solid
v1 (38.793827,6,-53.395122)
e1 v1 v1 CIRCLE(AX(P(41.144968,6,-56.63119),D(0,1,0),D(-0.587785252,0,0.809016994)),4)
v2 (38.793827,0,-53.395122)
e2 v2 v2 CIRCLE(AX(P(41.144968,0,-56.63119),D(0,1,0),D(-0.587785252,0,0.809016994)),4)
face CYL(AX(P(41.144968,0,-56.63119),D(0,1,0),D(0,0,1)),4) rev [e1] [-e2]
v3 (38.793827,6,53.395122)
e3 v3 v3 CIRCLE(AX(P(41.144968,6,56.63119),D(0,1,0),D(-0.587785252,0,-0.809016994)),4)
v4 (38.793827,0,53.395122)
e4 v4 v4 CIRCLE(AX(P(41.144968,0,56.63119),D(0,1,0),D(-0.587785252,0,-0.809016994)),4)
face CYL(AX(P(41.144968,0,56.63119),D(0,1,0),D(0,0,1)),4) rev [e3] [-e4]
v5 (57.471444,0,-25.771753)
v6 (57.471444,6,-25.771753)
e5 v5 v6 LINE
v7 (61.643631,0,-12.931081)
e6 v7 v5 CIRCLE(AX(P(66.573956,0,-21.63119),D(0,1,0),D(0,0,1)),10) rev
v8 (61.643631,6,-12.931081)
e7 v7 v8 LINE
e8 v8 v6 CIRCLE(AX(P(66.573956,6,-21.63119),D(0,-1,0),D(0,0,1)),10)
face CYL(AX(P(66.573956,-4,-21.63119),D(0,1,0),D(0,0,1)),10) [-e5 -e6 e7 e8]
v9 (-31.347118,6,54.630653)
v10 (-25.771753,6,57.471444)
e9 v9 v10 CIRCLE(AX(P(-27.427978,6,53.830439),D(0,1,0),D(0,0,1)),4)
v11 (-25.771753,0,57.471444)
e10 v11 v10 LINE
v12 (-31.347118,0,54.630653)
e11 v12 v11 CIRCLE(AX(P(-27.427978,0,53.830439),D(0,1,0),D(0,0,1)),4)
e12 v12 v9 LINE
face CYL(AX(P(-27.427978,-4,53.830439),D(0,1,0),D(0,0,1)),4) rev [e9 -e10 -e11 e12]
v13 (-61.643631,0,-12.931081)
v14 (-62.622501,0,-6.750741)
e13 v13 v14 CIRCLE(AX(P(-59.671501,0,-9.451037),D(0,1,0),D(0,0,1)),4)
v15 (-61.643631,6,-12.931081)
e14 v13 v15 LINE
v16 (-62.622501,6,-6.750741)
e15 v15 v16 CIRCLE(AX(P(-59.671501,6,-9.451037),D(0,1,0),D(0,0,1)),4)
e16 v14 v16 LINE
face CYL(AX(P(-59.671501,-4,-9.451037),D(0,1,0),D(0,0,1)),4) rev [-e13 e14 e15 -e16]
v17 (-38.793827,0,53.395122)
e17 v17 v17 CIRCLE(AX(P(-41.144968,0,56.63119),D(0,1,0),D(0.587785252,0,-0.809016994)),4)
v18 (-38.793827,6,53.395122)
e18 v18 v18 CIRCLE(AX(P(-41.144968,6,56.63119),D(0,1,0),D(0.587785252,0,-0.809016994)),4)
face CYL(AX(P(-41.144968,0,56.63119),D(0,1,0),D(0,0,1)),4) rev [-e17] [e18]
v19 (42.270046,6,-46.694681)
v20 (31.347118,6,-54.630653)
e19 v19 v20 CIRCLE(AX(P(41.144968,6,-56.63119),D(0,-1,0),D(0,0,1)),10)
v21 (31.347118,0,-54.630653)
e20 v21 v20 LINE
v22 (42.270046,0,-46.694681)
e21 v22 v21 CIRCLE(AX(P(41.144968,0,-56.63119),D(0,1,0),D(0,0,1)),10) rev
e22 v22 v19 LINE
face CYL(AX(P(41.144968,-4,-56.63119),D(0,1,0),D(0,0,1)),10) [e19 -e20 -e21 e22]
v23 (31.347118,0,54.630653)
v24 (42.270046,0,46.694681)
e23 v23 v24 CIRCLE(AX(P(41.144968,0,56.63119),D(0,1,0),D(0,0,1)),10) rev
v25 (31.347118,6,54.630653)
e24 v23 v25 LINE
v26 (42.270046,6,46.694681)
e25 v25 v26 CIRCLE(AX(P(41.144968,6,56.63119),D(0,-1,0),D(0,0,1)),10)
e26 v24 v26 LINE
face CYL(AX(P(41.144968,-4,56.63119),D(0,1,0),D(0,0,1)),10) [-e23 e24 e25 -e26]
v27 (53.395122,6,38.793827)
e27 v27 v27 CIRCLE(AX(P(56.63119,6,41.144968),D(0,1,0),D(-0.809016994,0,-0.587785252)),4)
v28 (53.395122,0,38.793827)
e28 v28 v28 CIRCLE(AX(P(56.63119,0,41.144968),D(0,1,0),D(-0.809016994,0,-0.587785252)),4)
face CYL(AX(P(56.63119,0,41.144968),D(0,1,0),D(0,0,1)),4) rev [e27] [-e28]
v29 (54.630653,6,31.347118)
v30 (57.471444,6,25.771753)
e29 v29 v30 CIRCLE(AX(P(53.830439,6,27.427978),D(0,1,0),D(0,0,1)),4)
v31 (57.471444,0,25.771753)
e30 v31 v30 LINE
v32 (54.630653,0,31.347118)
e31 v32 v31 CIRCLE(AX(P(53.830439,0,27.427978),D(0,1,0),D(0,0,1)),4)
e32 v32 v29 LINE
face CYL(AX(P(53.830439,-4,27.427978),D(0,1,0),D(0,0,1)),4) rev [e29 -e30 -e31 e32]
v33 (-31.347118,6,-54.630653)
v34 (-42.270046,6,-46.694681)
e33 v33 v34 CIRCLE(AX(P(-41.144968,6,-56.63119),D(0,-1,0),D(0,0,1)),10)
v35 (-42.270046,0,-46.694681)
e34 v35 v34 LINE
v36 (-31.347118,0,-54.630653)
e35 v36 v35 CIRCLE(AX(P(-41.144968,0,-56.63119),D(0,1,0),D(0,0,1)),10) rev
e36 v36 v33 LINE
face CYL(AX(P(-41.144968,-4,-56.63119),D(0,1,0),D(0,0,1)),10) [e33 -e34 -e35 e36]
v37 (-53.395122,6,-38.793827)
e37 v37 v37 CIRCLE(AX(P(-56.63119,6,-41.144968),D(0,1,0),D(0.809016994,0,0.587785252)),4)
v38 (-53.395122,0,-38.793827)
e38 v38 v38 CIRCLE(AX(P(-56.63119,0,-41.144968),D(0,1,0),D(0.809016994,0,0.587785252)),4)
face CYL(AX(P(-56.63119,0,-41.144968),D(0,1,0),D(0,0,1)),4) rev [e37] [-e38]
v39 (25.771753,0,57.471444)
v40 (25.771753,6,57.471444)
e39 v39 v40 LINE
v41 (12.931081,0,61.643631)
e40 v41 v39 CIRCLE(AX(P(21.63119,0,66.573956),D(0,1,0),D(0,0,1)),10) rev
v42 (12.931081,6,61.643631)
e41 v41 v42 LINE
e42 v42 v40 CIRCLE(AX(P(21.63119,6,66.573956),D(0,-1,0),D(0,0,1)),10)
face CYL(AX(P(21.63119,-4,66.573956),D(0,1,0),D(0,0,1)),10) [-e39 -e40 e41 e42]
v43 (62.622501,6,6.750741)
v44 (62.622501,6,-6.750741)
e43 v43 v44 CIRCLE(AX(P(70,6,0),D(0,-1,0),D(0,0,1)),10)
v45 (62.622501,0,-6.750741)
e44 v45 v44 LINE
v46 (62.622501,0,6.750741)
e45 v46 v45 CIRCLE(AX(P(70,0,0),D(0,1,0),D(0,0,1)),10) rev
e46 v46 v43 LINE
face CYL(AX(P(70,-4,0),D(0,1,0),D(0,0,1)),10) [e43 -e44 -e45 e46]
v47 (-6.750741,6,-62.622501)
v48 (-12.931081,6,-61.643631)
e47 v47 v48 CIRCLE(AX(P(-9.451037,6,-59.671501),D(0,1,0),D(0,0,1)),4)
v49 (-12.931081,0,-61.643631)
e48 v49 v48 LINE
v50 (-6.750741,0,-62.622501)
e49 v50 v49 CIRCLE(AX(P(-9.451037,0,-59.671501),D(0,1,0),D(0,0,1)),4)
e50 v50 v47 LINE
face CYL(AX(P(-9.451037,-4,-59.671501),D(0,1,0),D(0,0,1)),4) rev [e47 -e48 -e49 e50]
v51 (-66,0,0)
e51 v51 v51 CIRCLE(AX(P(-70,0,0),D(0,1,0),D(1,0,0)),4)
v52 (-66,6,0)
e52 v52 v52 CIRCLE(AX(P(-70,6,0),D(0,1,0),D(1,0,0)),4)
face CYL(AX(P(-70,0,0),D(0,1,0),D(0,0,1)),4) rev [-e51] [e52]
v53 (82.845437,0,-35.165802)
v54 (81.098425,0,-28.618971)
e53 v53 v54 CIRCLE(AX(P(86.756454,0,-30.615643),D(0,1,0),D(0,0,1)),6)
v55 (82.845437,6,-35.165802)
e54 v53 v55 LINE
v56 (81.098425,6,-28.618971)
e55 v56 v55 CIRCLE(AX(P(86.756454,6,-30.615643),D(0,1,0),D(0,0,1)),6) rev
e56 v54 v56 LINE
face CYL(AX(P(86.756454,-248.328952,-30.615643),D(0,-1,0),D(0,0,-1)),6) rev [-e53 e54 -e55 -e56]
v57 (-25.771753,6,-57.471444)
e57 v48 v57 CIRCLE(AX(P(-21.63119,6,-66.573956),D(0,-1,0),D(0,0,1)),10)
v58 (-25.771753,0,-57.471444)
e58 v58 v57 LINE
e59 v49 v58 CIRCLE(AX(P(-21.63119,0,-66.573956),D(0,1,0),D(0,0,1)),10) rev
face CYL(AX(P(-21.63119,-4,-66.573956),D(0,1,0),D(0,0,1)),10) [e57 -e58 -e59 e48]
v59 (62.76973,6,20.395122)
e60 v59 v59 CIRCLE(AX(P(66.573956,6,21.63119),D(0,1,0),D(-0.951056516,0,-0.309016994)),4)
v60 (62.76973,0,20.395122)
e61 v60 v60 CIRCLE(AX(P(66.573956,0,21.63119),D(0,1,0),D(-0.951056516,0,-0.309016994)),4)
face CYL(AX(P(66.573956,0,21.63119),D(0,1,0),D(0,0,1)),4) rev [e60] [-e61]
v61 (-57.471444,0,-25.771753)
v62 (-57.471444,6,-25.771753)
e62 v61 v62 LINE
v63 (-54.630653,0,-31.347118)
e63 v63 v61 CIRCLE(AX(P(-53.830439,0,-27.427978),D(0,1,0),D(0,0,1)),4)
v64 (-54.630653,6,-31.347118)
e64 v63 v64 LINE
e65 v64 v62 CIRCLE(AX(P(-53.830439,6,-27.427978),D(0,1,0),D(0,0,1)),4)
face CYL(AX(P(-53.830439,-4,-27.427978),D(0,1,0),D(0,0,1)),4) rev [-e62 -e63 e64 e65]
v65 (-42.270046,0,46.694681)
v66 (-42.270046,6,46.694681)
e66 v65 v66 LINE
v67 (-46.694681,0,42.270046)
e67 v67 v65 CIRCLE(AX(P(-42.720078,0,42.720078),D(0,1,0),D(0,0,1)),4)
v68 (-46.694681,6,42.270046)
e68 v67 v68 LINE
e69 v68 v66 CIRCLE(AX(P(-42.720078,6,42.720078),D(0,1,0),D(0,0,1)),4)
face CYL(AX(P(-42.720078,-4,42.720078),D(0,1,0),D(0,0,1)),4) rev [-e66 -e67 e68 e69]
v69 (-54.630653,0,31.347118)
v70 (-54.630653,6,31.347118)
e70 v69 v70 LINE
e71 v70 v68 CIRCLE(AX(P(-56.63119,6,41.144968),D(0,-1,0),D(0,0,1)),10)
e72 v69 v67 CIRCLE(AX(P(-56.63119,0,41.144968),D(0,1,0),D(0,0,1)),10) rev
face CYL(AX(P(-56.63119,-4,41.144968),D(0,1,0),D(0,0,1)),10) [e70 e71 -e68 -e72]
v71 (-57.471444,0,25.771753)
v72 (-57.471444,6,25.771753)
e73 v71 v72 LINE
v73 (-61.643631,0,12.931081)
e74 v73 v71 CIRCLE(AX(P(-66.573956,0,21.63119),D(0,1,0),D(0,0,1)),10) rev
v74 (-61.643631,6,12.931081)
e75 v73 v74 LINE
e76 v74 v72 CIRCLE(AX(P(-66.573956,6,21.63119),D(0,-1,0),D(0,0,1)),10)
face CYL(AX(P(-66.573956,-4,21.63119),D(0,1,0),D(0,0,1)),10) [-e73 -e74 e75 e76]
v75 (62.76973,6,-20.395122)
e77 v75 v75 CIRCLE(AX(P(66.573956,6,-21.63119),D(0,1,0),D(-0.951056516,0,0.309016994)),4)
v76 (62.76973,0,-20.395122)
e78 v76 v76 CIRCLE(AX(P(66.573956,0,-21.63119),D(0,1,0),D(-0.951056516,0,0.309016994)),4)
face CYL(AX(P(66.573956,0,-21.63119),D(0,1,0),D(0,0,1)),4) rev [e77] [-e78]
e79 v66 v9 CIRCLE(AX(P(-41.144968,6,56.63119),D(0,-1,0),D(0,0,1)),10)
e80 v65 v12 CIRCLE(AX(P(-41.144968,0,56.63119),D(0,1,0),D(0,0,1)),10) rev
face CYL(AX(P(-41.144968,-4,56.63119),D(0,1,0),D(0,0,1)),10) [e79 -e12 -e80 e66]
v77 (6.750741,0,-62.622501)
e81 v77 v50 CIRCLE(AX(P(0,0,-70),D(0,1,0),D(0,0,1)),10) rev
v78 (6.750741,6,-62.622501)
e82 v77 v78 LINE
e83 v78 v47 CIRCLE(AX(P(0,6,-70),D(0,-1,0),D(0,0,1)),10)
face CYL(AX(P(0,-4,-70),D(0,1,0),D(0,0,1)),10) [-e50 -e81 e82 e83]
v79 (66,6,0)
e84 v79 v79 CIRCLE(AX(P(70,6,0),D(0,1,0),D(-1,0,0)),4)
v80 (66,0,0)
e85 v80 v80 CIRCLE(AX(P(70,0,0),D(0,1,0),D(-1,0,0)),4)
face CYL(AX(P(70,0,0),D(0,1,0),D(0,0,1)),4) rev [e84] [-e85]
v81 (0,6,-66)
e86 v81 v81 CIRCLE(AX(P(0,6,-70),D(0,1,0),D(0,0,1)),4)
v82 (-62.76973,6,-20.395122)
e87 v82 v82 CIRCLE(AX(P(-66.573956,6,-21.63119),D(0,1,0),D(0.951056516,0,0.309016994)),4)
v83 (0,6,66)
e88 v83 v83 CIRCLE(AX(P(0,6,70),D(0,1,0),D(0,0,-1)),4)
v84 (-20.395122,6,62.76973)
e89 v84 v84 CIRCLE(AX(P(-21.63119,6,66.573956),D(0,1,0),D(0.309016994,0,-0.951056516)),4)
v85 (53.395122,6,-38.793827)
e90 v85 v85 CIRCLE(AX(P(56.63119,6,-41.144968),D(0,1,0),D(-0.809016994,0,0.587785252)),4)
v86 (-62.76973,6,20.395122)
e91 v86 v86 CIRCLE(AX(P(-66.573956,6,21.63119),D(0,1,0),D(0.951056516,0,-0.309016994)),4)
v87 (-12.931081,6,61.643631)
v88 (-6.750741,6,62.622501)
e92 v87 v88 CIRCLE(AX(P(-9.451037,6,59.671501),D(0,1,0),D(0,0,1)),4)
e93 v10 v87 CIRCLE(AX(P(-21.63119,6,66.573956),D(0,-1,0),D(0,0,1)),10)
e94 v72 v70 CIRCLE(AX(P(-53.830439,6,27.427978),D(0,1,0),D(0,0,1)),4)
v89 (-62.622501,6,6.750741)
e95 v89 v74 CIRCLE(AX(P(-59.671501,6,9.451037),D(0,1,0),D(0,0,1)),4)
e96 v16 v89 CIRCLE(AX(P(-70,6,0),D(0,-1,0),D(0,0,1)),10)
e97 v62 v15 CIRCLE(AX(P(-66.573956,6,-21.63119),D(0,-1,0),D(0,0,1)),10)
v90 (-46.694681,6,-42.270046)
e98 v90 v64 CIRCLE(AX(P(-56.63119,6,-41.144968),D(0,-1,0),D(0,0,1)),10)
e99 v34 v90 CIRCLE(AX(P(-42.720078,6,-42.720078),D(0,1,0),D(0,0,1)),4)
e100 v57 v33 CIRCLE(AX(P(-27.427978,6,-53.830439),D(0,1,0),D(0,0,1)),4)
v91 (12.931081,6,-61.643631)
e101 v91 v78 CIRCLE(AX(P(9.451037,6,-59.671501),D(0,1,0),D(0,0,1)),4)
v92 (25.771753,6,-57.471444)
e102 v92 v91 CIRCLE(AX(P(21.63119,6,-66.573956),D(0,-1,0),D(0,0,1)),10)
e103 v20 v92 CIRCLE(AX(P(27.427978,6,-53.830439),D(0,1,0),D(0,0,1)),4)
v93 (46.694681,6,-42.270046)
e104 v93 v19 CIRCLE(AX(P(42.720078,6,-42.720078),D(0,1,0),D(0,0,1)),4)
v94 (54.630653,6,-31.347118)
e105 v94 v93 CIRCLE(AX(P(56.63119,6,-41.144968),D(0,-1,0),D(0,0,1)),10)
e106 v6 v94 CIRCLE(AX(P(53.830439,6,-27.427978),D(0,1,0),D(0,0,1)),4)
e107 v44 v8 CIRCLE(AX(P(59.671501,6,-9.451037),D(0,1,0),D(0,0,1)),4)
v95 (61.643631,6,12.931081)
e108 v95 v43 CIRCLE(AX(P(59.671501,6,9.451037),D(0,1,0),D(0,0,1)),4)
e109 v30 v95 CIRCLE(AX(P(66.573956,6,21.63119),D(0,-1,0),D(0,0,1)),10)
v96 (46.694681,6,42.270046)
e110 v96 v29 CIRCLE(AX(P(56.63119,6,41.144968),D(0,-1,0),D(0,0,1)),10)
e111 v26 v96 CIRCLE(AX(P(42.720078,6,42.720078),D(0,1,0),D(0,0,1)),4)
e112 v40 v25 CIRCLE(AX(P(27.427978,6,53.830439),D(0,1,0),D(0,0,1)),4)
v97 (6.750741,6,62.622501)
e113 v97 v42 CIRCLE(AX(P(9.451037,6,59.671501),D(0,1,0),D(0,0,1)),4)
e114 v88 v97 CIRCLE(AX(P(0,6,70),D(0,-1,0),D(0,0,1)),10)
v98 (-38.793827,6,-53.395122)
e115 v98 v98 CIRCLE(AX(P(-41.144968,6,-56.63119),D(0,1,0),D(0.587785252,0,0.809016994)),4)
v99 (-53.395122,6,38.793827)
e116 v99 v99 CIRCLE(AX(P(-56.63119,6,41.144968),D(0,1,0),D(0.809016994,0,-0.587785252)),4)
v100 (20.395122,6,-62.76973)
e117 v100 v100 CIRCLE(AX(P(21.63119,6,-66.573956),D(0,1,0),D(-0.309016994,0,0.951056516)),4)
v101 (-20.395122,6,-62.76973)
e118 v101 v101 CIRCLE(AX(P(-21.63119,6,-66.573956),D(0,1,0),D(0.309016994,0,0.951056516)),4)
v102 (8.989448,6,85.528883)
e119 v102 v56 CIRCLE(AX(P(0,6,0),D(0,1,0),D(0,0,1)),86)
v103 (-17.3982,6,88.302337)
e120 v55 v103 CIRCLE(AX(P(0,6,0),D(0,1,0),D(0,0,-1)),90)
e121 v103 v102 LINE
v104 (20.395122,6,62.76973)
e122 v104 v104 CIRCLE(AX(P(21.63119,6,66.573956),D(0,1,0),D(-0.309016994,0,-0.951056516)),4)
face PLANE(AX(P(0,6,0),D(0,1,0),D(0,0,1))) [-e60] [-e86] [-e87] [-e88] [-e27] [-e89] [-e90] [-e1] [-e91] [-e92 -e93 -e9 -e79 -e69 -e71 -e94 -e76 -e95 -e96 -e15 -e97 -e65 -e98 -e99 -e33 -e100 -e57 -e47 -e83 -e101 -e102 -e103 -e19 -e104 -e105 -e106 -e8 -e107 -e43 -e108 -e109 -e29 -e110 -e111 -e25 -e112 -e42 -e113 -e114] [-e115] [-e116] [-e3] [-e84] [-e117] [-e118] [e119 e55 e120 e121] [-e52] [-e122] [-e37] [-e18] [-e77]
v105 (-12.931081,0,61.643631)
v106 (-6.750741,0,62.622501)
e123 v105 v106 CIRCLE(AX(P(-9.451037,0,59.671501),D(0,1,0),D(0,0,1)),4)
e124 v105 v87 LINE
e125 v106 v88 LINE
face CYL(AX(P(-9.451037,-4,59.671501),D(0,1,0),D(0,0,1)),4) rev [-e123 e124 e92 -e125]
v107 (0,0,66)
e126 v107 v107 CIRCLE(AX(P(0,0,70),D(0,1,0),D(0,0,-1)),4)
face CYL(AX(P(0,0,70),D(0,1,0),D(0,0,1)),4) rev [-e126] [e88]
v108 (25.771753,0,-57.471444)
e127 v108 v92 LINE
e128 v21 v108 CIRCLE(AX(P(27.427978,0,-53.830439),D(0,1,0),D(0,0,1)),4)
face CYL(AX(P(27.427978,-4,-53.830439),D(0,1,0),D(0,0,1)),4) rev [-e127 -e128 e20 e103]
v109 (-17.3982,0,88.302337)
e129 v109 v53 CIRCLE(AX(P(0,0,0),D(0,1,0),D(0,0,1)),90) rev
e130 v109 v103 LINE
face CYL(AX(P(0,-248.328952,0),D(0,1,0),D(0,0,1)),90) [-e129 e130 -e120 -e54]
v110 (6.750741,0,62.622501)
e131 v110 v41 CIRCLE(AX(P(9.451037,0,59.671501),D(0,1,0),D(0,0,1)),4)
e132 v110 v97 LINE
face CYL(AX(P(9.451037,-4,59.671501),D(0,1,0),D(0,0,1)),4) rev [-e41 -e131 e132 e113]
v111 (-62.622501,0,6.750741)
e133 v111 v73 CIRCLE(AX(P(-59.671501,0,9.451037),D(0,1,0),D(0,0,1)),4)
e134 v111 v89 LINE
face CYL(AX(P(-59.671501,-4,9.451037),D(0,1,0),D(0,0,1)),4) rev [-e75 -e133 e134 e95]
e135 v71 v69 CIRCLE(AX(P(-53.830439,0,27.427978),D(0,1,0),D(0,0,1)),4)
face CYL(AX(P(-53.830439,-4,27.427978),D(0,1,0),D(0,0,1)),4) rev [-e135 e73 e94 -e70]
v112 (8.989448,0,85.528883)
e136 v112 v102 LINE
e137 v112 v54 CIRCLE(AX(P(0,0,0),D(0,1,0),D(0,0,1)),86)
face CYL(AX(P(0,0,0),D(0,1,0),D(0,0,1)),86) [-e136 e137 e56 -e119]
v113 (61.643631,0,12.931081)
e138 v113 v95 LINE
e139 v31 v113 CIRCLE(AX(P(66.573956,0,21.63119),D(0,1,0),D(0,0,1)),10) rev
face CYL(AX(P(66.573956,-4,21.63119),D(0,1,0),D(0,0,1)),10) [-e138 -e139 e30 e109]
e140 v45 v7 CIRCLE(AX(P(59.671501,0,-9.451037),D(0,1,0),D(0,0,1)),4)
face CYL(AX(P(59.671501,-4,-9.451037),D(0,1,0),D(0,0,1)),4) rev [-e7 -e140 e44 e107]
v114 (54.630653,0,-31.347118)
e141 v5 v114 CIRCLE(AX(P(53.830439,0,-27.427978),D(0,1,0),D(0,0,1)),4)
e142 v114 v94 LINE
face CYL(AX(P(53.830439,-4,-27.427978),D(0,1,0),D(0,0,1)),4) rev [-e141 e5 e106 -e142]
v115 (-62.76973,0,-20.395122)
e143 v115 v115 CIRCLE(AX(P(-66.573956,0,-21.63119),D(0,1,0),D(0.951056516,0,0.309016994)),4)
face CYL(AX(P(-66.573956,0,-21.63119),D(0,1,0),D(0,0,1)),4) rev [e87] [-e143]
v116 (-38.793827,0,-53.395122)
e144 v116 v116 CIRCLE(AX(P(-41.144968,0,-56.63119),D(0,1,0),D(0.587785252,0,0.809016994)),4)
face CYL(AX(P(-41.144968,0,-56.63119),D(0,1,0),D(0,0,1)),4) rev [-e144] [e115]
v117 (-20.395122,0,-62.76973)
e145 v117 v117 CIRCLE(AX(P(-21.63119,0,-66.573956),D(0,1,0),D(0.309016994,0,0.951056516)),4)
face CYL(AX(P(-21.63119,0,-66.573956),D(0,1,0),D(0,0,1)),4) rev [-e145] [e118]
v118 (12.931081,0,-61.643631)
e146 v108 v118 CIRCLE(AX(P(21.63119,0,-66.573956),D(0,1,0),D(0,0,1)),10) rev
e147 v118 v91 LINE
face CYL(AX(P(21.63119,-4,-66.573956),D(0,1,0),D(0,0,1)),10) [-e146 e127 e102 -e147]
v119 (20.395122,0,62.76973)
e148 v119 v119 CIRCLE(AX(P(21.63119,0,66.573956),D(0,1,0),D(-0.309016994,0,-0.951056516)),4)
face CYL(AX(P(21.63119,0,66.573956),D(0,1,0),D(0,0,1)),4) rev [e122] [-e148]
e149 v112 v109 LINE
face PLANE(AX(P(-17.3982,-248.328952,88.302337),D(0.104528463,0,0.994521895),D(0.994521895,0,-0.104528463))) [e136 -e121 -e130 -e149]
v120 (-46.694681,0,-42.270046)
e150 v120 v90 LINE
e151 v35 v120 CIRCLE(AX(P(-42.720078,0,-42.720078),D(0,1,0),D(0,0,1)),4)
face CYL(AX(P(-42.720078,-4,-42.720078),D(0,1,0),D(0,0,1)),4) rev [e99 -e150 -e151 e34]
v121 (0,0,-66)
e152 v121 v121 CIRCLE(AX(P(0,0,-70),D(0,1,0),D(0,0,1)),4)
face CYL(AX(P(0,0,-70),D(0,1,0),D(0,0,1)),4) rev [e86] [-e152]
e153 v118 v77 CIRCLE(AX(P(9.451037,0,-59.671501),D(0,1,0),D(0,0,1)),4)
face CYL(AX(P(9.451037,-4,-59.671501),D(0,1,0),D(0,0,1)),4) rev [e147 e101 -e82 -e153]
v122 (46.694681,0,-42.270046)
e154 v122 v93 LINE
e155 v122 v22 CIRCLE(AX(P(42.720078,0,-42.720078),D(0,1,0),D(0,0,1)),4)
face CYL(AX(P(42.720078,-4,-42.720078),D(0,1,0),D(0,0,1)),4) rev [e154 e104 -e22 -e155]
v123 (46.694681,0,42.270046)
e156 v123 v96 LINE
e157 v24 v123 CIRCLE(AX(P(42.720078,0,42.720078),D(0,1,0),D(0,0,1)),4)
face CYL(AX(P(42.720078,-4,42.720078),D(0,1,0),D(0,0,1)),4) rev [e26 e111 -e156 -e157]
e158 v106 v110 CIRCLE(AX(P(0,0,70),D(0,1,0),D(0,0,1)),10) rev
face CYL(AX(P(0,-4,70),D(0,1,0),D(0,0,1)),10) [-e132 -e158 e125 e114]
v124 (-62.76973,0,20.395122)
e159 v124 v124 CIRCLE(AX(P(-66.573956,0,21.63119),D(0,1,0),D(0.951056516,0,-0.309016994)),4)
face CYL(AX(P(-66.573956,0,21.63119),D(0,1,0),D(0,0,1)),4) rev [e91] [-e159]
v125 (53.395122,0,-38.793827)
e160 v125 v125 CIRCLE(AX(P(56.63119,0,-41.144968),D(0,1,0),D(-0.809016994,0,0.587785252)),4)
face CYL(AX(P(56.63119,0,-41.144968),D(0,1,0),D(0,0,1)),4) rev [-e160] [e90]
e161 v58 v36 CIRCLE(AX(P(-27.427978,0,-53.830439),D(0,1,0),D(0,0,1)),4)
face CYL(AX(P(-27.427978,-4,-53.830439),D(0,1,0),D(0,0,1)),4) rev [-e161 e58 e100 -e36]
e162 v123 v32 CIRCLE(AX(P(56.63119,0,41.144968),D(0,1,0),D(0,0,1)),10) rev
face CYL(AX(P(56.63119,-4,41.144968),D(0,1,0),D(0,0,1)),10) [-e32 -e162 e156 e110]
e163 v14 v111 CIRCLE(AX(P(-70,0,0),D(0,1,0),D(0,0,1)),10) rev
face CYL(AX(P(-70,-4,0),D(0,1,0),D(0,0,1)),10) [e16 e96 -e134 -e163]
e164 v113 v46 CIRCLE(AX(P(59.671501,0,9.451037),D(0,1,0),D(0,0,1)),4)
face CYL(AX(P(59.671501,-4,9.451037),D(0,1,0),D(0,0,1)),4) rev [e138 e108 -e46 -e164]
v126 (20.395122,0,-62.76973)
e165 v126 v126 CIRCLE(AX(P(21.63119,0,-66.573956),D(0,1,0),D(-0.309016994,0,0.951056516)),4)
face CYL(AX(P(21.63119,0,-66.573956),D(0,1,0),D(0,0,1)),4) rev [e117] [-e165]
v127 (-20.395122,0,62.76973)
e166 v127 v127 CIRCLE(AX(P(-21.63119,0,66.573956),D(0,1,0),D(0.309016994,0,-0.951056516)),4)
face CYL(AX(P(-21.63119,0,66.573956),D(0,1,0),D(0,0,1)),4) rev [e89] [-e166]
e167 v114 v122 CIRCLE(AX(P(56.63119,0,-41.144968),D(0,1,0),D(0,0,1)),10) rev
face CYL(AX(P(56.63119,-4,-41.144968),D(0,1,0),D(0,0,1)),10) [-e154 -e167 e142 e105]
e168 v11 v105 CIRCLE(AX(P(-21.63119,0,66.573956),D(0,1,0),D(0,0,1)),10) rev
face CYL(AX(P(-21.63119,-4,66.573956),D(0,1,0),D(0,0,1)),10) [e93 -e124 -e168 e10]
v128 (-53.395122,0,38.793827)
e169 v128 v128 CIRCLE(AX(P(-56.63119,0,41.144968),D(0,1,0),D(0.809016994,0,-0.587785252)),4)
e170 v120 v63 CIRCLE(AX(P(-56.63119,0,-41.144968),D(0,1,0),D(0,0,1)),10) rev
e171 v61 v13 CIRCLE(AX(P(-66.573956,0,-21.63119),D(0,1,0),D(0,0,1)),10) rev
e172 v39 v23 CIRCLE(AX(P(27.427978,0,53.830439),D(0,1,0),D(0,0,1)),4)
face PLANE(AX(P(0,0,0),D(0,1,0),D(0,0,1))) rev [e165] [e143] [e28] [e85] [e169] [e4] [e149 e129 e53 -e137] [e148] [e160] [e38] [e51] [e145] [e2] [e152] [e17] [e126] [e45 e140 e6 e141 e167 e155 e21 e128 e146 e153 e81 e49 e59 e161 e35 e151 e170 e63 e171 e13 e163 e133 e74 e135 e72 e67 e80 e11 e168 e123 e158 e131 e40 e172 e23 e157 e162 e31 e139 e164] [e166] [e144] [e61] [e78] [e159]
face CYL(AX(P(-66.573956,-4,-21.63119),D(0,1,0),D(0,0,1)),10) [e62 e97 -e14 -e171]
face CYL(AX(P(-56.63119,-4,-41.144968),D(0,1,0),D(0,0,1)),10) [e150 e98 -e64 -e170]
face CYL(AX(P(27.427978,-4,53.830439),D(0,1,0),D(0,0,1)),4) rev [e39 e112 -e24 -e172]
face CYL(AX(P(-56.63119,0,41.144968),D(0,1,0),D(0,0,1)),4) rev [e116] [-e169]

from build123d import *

# Parameters (mm, degrees)
SKETCH1_R           = 102.5
SKETCH1_R_2         = 60
BOSS_EXTRUDE1_DEPTH = 6
SKETCH2_R           = 4
CUT_EXTRUDE1_DEPTH  = 146.081011852
CIRPATTERN1_COUNT   = 20
SKETCH4_OUTSIDE_W   = 264.996
SKETCH4_OUTSIDE_H   = 264.996
SKETCH4_OUTSIDE_R   = 86
CUT_EXTRUDE3_DEPTH  = 146.081011852
CUT_EXTRUDE4_DEPTH  = 10
BOSS_EXTRUDE2_DEPTH = 6
FILLET1_R           = 6


with BuildPart() as part:
    # Sketch1 → Boss-Extrude1 (new body)
    with BuildSketch(Plane(origin=(0, 0, 0), x_dir=(1, 0, 0), z_dir=(0, 1, 0))):
        with Locations(Location((0, 0, 0), (0, 0, 270))):
            Circle(SKETCH1_R)
        with Locations(Location((0, 0, 0), (0, 0, 270))):
            Circle(SKETCH1_R_2, mode=Mode.SUBTRACT)
    extrude(amount=BOSS_EXTRUDE1_DEPTH)

    # Sketch2 → Cut-Extrude1 (cut, through all)
    with BuildSketch(Plane(origin=(0, 6, 0), x_dir=(1, 0, 0), z_dir=(0, 1, 0))):
        with Locations(Location((0, 70, 0), (0, 0, 270))):
            Circle(SKETCH2_R)
    cut_extrude1 = extrude(amount=-CUT_EXTRUDE1_DEPTH, mode=Mode.SUBTRACT)

    # CirPattern1: Cut-Extrude1 ×20 about axis
    cirpattern1_axis = Axis((0, 0, 0), (0, 1, 0))
    for i in range(1, CIRPATTERN1_COUNT):
        add(cut_extrude1.rotate(cirpattern1_axis, i * 360 / CIRPATTERN1_COUNT), mode=Mode.SUBTRACT)

    # Sketch4 outside → Cut-Extrude3 (cut, through all)
    with BuildSketch(Plane(origin=(0, 6, 0), x_dir=(1, 0, 0), z_dir=(0, 1, 0))):
        Rectangle(SKETCH4_OUTSIDE_W, SKETCH4_OUTSIDE_H)
        with Locations(Location((0, 0, 0), (0, 0, 270))):
            Circle(SKETCH4_OUTSIDE_R, mode=Mode.SUBTRACT)
    extrude(amount=-CUT_EXTRUDE3_DEPTH, mode=Mode.SUBTRACT)

    # Sketch5 → Cut-Extrude4 (cut)
    with BuildSketch(Plane(origin=(0, 6, 0), x_dir=(1, 0, 0), z_dir=(0, 1, 0))):
        with BuildLine():
            ThreePointArc((46.694681279, 42.270046437), (48.541019662, 35.267115138), (54.63065317, 31.347118204))
            ThreePointArc((54.63065317, 31.347118204), (57.394464692, 29.243940421), (57.471443608, 25.771753046))
            ThreePointArc((57.471443608, 25.771753046), (57.063390978, 18.541019662), (61.643630936, 12.931080792))
            ThreePointArc((61.643630936, 12.931080792), (63.622254217, 10.076775126), (62.622500611, 6.750740904))
            ThreePointArc((62.622500611, 6.750740904), (60, 0), (62.622500611, -6.750740904))
            ThreePointArc((62.622500611, -6.750740904), (63.622254217, -10.076775126), (61.643630936, -12.931080792))
            ThreePointArc((61.643630936, -12.931080792), (57.063390978, -18.541019662), (57.471443608, -25.771753046))
            ThreePointArc((57.471443608, -25.771753046), (57.394464692, -29.243940421), (54.63065317, -31.347118204))
            ThreePointArc((54.63065317, -31.347118204), (48.541019662, -35.267115138), (46.694681279, -42.270046437))
            ThreePointArc((46.694681279, -42.270046437), (45.548505072, -45.548505072), (42.270046437, -46.694681279))
            ThreePointArc((42.270046437, -46.694681279), (35.267115138, -48.541019662), (31.347118204, -54.63065317))
            ThreePointArc((31.347118204, -54.63065317), (29.243940421, -57.394464692), (25.771753046, -57.471443608))
            ThreePointArc((25.771753046, -57.471443608), (18.541019662, -57.063390978), (12.931080792, -61.643630936))
            ThreePointArc((12.931080792, -61.643630936), (10.076775126, -63.622254217), (6.750740904, -62.622500611))
            ThreePointArc((6.750740904, -62.622500611), (0, -60), (-6.750740904, -62.622500611))
            ThreePointArc((-6.750740904, -62.622500611), (-10.076775126, -63.622254217), (-12.931080792, -61.643630936))
            ThreePointArc((-12.931080792, -61.643630936), (-18.541019662, -57.063390978), (-25.771753046, -57.471443608))
            ThreePointArc((-25.771753046, -57.471443608), (-29.243940421, -57.394464692), (-31.347118204, -54.63065317))
            ThreePointArc((-31.347118204, -54.63065317), (-35.267115138, -48.541019662), (-42.270046437, -46.694681279))
            ThreePointArc((-42.270046437, -46.694681279), (-45.548505072, -45.548505072), (-46.694681279, -42.270046437))
            ThreePointArc((-46.694681279, -42.270046437), (-48.541019662, -35.267115138), (-54.63065317, -31.347118204))
            ThreePointArc((-54.63065317, -31.347118204), (-57.394464692, -29.243940421), (-57.471443608, -25.771753046))
            ThreePointArc((-57.471443608, -25.771753046), (-57.063390978, -18.541019662), (-61.643630936, -12.931080792))
            ThreePointArc((-61.643630936, -12.931080792), (-63.622254217, -10.076775126), (-62.622500611, -6.750740904))
            ThreePointArc((-62.622500611, -6.750740904), (-60, 0), (-62.622500611, 6.750740904))
            ThreePointArc((-62.622500611, 6.750740904), (-63.622254217, 10.076775126), (-61.643630936, 12.931080792))
            ThreePointArc((-61.643630936, 12.931080792), (-57.063390978, 18.541019662), (-57.471443608, 25.771753046))
            ThreePointArc((-57.471443608, 25.771753046), (-57.394464692, 29.243940421), (-54.63065317, 31.347118204))
            ThreePointArc((-54.63065317, 31.347118204), (-48.541019662, 35.267115138), (-46.694681279, 42.270046437))
            ThreePointArc((-46.694681279, 42.270046437), (-45.548505072, 45.548505072), (-42.270046437, 46.694681279))
            ThreePointArc((-42.270046437, 46.694681279), (-35.267115138, 48.541019662), (-31.347118204, 54.63065317))
            ThreePointArc((-31.347118204, 54.63065317), (-29.243940421, 57.394464692), (-25.771753046, 57.471443608))
            ThreePointArc((-25.771753046, 57.471443608), (-18.541019662, 57.063390978), (-12.931080792, 61.643630936))
            ThreePointArc((-12.931080792, 61.643630936), (-10.076775126, 63.622254217), (-6.750740904, 62.622500611))
            ThreePointArc((-6.750740904, 62.622500611), (0, 60), (6.750740904, 62.622500611))
            ThreePointArc((6.750740904, 62.622500611), (10.076775126, 63.622254217), (12.931080792, 61.643630936))
            ThreePointArc((12.931080792, 61.643630936), (18.541019662, 57.063390978), (25.771753046, 57.471443608))
            ThreePointArc((25.771753046, 57.471443608), (29.243940421, 57.394464692), (31.347118204, 54.63065317))
            ThreePointArc((31.347118204, 54.63065317), (35.267115138, 48.541019662), (42.270046437, 46.694681279))
            ThreePointArc((42.270046437, 46.694681279), (45.548505072, 45.548505072), (46.694681279, 42.270046437))
        make_face()
    extrude(amount=-CUT_EXTRUDE4_DEPTH, mode=Mode.SUBTRACT)

    # Sketch6 → Boss-Extrude2 (add)
    with BuildSketch(Plane(origin=(0, 6, 0), x_dir=(1, 0, 0), z_dir=(0, 1, 0))):
        with BuildLine():
            Line((-17.398199941, -88.302336542), (8.989447841, -85.528883002))
            ThreePointArc((8.989447841, -85.528883002), (-74.100107798, 43.648299215), (79.163417397, 33.60287705))
            Line((79.163417397, 33.60287705), (82.845436811, 35.165801564))
            ThreePointArc((82.845436811, 35.165801564), (-69.870812829, 56.728031119), (-17.398199941, -88.302336542))
        make_face()
    extrude(amount=-BOSS_EXTRUDE2_DEPTH)

    # Fillet1
    # the kernel refuses this fillet: 6 mm, written as the material it adds along each edge
    with BuildSketch(Plane(origin=(79.163417397, 6, -33.60287705), x_dir=(0.36192981714556505, 0, 0.9322053461877259), z_dir=(0, -1, 0))) as fillet1_piece_1:
        with BuildLine():
            CenterArc((5.532861862, -5.997100749), FILLET1_R, 91.781239909, 68.757327573)
            Line((-0.124333974, -3.998067166), (-0.237477891, -3.958086494))
            ThreePointArc((-0.237477891, -3.958086494), (-0.182109002, -1.995303564), (-0.119942015, 0.003730019))
            Line((-0.119942015, 0.003730019), (0.003730019, 0.119942015))
            ThreePointArc((0.003730019, 0.119942015), (2.67318045, 0.078444066), (5.342630881, 0.119942015))
            Line((5.342630881, 0.119942015), (5.346360901, 0))
        make_face()
    extrude(amount=6)


solid = part.part
